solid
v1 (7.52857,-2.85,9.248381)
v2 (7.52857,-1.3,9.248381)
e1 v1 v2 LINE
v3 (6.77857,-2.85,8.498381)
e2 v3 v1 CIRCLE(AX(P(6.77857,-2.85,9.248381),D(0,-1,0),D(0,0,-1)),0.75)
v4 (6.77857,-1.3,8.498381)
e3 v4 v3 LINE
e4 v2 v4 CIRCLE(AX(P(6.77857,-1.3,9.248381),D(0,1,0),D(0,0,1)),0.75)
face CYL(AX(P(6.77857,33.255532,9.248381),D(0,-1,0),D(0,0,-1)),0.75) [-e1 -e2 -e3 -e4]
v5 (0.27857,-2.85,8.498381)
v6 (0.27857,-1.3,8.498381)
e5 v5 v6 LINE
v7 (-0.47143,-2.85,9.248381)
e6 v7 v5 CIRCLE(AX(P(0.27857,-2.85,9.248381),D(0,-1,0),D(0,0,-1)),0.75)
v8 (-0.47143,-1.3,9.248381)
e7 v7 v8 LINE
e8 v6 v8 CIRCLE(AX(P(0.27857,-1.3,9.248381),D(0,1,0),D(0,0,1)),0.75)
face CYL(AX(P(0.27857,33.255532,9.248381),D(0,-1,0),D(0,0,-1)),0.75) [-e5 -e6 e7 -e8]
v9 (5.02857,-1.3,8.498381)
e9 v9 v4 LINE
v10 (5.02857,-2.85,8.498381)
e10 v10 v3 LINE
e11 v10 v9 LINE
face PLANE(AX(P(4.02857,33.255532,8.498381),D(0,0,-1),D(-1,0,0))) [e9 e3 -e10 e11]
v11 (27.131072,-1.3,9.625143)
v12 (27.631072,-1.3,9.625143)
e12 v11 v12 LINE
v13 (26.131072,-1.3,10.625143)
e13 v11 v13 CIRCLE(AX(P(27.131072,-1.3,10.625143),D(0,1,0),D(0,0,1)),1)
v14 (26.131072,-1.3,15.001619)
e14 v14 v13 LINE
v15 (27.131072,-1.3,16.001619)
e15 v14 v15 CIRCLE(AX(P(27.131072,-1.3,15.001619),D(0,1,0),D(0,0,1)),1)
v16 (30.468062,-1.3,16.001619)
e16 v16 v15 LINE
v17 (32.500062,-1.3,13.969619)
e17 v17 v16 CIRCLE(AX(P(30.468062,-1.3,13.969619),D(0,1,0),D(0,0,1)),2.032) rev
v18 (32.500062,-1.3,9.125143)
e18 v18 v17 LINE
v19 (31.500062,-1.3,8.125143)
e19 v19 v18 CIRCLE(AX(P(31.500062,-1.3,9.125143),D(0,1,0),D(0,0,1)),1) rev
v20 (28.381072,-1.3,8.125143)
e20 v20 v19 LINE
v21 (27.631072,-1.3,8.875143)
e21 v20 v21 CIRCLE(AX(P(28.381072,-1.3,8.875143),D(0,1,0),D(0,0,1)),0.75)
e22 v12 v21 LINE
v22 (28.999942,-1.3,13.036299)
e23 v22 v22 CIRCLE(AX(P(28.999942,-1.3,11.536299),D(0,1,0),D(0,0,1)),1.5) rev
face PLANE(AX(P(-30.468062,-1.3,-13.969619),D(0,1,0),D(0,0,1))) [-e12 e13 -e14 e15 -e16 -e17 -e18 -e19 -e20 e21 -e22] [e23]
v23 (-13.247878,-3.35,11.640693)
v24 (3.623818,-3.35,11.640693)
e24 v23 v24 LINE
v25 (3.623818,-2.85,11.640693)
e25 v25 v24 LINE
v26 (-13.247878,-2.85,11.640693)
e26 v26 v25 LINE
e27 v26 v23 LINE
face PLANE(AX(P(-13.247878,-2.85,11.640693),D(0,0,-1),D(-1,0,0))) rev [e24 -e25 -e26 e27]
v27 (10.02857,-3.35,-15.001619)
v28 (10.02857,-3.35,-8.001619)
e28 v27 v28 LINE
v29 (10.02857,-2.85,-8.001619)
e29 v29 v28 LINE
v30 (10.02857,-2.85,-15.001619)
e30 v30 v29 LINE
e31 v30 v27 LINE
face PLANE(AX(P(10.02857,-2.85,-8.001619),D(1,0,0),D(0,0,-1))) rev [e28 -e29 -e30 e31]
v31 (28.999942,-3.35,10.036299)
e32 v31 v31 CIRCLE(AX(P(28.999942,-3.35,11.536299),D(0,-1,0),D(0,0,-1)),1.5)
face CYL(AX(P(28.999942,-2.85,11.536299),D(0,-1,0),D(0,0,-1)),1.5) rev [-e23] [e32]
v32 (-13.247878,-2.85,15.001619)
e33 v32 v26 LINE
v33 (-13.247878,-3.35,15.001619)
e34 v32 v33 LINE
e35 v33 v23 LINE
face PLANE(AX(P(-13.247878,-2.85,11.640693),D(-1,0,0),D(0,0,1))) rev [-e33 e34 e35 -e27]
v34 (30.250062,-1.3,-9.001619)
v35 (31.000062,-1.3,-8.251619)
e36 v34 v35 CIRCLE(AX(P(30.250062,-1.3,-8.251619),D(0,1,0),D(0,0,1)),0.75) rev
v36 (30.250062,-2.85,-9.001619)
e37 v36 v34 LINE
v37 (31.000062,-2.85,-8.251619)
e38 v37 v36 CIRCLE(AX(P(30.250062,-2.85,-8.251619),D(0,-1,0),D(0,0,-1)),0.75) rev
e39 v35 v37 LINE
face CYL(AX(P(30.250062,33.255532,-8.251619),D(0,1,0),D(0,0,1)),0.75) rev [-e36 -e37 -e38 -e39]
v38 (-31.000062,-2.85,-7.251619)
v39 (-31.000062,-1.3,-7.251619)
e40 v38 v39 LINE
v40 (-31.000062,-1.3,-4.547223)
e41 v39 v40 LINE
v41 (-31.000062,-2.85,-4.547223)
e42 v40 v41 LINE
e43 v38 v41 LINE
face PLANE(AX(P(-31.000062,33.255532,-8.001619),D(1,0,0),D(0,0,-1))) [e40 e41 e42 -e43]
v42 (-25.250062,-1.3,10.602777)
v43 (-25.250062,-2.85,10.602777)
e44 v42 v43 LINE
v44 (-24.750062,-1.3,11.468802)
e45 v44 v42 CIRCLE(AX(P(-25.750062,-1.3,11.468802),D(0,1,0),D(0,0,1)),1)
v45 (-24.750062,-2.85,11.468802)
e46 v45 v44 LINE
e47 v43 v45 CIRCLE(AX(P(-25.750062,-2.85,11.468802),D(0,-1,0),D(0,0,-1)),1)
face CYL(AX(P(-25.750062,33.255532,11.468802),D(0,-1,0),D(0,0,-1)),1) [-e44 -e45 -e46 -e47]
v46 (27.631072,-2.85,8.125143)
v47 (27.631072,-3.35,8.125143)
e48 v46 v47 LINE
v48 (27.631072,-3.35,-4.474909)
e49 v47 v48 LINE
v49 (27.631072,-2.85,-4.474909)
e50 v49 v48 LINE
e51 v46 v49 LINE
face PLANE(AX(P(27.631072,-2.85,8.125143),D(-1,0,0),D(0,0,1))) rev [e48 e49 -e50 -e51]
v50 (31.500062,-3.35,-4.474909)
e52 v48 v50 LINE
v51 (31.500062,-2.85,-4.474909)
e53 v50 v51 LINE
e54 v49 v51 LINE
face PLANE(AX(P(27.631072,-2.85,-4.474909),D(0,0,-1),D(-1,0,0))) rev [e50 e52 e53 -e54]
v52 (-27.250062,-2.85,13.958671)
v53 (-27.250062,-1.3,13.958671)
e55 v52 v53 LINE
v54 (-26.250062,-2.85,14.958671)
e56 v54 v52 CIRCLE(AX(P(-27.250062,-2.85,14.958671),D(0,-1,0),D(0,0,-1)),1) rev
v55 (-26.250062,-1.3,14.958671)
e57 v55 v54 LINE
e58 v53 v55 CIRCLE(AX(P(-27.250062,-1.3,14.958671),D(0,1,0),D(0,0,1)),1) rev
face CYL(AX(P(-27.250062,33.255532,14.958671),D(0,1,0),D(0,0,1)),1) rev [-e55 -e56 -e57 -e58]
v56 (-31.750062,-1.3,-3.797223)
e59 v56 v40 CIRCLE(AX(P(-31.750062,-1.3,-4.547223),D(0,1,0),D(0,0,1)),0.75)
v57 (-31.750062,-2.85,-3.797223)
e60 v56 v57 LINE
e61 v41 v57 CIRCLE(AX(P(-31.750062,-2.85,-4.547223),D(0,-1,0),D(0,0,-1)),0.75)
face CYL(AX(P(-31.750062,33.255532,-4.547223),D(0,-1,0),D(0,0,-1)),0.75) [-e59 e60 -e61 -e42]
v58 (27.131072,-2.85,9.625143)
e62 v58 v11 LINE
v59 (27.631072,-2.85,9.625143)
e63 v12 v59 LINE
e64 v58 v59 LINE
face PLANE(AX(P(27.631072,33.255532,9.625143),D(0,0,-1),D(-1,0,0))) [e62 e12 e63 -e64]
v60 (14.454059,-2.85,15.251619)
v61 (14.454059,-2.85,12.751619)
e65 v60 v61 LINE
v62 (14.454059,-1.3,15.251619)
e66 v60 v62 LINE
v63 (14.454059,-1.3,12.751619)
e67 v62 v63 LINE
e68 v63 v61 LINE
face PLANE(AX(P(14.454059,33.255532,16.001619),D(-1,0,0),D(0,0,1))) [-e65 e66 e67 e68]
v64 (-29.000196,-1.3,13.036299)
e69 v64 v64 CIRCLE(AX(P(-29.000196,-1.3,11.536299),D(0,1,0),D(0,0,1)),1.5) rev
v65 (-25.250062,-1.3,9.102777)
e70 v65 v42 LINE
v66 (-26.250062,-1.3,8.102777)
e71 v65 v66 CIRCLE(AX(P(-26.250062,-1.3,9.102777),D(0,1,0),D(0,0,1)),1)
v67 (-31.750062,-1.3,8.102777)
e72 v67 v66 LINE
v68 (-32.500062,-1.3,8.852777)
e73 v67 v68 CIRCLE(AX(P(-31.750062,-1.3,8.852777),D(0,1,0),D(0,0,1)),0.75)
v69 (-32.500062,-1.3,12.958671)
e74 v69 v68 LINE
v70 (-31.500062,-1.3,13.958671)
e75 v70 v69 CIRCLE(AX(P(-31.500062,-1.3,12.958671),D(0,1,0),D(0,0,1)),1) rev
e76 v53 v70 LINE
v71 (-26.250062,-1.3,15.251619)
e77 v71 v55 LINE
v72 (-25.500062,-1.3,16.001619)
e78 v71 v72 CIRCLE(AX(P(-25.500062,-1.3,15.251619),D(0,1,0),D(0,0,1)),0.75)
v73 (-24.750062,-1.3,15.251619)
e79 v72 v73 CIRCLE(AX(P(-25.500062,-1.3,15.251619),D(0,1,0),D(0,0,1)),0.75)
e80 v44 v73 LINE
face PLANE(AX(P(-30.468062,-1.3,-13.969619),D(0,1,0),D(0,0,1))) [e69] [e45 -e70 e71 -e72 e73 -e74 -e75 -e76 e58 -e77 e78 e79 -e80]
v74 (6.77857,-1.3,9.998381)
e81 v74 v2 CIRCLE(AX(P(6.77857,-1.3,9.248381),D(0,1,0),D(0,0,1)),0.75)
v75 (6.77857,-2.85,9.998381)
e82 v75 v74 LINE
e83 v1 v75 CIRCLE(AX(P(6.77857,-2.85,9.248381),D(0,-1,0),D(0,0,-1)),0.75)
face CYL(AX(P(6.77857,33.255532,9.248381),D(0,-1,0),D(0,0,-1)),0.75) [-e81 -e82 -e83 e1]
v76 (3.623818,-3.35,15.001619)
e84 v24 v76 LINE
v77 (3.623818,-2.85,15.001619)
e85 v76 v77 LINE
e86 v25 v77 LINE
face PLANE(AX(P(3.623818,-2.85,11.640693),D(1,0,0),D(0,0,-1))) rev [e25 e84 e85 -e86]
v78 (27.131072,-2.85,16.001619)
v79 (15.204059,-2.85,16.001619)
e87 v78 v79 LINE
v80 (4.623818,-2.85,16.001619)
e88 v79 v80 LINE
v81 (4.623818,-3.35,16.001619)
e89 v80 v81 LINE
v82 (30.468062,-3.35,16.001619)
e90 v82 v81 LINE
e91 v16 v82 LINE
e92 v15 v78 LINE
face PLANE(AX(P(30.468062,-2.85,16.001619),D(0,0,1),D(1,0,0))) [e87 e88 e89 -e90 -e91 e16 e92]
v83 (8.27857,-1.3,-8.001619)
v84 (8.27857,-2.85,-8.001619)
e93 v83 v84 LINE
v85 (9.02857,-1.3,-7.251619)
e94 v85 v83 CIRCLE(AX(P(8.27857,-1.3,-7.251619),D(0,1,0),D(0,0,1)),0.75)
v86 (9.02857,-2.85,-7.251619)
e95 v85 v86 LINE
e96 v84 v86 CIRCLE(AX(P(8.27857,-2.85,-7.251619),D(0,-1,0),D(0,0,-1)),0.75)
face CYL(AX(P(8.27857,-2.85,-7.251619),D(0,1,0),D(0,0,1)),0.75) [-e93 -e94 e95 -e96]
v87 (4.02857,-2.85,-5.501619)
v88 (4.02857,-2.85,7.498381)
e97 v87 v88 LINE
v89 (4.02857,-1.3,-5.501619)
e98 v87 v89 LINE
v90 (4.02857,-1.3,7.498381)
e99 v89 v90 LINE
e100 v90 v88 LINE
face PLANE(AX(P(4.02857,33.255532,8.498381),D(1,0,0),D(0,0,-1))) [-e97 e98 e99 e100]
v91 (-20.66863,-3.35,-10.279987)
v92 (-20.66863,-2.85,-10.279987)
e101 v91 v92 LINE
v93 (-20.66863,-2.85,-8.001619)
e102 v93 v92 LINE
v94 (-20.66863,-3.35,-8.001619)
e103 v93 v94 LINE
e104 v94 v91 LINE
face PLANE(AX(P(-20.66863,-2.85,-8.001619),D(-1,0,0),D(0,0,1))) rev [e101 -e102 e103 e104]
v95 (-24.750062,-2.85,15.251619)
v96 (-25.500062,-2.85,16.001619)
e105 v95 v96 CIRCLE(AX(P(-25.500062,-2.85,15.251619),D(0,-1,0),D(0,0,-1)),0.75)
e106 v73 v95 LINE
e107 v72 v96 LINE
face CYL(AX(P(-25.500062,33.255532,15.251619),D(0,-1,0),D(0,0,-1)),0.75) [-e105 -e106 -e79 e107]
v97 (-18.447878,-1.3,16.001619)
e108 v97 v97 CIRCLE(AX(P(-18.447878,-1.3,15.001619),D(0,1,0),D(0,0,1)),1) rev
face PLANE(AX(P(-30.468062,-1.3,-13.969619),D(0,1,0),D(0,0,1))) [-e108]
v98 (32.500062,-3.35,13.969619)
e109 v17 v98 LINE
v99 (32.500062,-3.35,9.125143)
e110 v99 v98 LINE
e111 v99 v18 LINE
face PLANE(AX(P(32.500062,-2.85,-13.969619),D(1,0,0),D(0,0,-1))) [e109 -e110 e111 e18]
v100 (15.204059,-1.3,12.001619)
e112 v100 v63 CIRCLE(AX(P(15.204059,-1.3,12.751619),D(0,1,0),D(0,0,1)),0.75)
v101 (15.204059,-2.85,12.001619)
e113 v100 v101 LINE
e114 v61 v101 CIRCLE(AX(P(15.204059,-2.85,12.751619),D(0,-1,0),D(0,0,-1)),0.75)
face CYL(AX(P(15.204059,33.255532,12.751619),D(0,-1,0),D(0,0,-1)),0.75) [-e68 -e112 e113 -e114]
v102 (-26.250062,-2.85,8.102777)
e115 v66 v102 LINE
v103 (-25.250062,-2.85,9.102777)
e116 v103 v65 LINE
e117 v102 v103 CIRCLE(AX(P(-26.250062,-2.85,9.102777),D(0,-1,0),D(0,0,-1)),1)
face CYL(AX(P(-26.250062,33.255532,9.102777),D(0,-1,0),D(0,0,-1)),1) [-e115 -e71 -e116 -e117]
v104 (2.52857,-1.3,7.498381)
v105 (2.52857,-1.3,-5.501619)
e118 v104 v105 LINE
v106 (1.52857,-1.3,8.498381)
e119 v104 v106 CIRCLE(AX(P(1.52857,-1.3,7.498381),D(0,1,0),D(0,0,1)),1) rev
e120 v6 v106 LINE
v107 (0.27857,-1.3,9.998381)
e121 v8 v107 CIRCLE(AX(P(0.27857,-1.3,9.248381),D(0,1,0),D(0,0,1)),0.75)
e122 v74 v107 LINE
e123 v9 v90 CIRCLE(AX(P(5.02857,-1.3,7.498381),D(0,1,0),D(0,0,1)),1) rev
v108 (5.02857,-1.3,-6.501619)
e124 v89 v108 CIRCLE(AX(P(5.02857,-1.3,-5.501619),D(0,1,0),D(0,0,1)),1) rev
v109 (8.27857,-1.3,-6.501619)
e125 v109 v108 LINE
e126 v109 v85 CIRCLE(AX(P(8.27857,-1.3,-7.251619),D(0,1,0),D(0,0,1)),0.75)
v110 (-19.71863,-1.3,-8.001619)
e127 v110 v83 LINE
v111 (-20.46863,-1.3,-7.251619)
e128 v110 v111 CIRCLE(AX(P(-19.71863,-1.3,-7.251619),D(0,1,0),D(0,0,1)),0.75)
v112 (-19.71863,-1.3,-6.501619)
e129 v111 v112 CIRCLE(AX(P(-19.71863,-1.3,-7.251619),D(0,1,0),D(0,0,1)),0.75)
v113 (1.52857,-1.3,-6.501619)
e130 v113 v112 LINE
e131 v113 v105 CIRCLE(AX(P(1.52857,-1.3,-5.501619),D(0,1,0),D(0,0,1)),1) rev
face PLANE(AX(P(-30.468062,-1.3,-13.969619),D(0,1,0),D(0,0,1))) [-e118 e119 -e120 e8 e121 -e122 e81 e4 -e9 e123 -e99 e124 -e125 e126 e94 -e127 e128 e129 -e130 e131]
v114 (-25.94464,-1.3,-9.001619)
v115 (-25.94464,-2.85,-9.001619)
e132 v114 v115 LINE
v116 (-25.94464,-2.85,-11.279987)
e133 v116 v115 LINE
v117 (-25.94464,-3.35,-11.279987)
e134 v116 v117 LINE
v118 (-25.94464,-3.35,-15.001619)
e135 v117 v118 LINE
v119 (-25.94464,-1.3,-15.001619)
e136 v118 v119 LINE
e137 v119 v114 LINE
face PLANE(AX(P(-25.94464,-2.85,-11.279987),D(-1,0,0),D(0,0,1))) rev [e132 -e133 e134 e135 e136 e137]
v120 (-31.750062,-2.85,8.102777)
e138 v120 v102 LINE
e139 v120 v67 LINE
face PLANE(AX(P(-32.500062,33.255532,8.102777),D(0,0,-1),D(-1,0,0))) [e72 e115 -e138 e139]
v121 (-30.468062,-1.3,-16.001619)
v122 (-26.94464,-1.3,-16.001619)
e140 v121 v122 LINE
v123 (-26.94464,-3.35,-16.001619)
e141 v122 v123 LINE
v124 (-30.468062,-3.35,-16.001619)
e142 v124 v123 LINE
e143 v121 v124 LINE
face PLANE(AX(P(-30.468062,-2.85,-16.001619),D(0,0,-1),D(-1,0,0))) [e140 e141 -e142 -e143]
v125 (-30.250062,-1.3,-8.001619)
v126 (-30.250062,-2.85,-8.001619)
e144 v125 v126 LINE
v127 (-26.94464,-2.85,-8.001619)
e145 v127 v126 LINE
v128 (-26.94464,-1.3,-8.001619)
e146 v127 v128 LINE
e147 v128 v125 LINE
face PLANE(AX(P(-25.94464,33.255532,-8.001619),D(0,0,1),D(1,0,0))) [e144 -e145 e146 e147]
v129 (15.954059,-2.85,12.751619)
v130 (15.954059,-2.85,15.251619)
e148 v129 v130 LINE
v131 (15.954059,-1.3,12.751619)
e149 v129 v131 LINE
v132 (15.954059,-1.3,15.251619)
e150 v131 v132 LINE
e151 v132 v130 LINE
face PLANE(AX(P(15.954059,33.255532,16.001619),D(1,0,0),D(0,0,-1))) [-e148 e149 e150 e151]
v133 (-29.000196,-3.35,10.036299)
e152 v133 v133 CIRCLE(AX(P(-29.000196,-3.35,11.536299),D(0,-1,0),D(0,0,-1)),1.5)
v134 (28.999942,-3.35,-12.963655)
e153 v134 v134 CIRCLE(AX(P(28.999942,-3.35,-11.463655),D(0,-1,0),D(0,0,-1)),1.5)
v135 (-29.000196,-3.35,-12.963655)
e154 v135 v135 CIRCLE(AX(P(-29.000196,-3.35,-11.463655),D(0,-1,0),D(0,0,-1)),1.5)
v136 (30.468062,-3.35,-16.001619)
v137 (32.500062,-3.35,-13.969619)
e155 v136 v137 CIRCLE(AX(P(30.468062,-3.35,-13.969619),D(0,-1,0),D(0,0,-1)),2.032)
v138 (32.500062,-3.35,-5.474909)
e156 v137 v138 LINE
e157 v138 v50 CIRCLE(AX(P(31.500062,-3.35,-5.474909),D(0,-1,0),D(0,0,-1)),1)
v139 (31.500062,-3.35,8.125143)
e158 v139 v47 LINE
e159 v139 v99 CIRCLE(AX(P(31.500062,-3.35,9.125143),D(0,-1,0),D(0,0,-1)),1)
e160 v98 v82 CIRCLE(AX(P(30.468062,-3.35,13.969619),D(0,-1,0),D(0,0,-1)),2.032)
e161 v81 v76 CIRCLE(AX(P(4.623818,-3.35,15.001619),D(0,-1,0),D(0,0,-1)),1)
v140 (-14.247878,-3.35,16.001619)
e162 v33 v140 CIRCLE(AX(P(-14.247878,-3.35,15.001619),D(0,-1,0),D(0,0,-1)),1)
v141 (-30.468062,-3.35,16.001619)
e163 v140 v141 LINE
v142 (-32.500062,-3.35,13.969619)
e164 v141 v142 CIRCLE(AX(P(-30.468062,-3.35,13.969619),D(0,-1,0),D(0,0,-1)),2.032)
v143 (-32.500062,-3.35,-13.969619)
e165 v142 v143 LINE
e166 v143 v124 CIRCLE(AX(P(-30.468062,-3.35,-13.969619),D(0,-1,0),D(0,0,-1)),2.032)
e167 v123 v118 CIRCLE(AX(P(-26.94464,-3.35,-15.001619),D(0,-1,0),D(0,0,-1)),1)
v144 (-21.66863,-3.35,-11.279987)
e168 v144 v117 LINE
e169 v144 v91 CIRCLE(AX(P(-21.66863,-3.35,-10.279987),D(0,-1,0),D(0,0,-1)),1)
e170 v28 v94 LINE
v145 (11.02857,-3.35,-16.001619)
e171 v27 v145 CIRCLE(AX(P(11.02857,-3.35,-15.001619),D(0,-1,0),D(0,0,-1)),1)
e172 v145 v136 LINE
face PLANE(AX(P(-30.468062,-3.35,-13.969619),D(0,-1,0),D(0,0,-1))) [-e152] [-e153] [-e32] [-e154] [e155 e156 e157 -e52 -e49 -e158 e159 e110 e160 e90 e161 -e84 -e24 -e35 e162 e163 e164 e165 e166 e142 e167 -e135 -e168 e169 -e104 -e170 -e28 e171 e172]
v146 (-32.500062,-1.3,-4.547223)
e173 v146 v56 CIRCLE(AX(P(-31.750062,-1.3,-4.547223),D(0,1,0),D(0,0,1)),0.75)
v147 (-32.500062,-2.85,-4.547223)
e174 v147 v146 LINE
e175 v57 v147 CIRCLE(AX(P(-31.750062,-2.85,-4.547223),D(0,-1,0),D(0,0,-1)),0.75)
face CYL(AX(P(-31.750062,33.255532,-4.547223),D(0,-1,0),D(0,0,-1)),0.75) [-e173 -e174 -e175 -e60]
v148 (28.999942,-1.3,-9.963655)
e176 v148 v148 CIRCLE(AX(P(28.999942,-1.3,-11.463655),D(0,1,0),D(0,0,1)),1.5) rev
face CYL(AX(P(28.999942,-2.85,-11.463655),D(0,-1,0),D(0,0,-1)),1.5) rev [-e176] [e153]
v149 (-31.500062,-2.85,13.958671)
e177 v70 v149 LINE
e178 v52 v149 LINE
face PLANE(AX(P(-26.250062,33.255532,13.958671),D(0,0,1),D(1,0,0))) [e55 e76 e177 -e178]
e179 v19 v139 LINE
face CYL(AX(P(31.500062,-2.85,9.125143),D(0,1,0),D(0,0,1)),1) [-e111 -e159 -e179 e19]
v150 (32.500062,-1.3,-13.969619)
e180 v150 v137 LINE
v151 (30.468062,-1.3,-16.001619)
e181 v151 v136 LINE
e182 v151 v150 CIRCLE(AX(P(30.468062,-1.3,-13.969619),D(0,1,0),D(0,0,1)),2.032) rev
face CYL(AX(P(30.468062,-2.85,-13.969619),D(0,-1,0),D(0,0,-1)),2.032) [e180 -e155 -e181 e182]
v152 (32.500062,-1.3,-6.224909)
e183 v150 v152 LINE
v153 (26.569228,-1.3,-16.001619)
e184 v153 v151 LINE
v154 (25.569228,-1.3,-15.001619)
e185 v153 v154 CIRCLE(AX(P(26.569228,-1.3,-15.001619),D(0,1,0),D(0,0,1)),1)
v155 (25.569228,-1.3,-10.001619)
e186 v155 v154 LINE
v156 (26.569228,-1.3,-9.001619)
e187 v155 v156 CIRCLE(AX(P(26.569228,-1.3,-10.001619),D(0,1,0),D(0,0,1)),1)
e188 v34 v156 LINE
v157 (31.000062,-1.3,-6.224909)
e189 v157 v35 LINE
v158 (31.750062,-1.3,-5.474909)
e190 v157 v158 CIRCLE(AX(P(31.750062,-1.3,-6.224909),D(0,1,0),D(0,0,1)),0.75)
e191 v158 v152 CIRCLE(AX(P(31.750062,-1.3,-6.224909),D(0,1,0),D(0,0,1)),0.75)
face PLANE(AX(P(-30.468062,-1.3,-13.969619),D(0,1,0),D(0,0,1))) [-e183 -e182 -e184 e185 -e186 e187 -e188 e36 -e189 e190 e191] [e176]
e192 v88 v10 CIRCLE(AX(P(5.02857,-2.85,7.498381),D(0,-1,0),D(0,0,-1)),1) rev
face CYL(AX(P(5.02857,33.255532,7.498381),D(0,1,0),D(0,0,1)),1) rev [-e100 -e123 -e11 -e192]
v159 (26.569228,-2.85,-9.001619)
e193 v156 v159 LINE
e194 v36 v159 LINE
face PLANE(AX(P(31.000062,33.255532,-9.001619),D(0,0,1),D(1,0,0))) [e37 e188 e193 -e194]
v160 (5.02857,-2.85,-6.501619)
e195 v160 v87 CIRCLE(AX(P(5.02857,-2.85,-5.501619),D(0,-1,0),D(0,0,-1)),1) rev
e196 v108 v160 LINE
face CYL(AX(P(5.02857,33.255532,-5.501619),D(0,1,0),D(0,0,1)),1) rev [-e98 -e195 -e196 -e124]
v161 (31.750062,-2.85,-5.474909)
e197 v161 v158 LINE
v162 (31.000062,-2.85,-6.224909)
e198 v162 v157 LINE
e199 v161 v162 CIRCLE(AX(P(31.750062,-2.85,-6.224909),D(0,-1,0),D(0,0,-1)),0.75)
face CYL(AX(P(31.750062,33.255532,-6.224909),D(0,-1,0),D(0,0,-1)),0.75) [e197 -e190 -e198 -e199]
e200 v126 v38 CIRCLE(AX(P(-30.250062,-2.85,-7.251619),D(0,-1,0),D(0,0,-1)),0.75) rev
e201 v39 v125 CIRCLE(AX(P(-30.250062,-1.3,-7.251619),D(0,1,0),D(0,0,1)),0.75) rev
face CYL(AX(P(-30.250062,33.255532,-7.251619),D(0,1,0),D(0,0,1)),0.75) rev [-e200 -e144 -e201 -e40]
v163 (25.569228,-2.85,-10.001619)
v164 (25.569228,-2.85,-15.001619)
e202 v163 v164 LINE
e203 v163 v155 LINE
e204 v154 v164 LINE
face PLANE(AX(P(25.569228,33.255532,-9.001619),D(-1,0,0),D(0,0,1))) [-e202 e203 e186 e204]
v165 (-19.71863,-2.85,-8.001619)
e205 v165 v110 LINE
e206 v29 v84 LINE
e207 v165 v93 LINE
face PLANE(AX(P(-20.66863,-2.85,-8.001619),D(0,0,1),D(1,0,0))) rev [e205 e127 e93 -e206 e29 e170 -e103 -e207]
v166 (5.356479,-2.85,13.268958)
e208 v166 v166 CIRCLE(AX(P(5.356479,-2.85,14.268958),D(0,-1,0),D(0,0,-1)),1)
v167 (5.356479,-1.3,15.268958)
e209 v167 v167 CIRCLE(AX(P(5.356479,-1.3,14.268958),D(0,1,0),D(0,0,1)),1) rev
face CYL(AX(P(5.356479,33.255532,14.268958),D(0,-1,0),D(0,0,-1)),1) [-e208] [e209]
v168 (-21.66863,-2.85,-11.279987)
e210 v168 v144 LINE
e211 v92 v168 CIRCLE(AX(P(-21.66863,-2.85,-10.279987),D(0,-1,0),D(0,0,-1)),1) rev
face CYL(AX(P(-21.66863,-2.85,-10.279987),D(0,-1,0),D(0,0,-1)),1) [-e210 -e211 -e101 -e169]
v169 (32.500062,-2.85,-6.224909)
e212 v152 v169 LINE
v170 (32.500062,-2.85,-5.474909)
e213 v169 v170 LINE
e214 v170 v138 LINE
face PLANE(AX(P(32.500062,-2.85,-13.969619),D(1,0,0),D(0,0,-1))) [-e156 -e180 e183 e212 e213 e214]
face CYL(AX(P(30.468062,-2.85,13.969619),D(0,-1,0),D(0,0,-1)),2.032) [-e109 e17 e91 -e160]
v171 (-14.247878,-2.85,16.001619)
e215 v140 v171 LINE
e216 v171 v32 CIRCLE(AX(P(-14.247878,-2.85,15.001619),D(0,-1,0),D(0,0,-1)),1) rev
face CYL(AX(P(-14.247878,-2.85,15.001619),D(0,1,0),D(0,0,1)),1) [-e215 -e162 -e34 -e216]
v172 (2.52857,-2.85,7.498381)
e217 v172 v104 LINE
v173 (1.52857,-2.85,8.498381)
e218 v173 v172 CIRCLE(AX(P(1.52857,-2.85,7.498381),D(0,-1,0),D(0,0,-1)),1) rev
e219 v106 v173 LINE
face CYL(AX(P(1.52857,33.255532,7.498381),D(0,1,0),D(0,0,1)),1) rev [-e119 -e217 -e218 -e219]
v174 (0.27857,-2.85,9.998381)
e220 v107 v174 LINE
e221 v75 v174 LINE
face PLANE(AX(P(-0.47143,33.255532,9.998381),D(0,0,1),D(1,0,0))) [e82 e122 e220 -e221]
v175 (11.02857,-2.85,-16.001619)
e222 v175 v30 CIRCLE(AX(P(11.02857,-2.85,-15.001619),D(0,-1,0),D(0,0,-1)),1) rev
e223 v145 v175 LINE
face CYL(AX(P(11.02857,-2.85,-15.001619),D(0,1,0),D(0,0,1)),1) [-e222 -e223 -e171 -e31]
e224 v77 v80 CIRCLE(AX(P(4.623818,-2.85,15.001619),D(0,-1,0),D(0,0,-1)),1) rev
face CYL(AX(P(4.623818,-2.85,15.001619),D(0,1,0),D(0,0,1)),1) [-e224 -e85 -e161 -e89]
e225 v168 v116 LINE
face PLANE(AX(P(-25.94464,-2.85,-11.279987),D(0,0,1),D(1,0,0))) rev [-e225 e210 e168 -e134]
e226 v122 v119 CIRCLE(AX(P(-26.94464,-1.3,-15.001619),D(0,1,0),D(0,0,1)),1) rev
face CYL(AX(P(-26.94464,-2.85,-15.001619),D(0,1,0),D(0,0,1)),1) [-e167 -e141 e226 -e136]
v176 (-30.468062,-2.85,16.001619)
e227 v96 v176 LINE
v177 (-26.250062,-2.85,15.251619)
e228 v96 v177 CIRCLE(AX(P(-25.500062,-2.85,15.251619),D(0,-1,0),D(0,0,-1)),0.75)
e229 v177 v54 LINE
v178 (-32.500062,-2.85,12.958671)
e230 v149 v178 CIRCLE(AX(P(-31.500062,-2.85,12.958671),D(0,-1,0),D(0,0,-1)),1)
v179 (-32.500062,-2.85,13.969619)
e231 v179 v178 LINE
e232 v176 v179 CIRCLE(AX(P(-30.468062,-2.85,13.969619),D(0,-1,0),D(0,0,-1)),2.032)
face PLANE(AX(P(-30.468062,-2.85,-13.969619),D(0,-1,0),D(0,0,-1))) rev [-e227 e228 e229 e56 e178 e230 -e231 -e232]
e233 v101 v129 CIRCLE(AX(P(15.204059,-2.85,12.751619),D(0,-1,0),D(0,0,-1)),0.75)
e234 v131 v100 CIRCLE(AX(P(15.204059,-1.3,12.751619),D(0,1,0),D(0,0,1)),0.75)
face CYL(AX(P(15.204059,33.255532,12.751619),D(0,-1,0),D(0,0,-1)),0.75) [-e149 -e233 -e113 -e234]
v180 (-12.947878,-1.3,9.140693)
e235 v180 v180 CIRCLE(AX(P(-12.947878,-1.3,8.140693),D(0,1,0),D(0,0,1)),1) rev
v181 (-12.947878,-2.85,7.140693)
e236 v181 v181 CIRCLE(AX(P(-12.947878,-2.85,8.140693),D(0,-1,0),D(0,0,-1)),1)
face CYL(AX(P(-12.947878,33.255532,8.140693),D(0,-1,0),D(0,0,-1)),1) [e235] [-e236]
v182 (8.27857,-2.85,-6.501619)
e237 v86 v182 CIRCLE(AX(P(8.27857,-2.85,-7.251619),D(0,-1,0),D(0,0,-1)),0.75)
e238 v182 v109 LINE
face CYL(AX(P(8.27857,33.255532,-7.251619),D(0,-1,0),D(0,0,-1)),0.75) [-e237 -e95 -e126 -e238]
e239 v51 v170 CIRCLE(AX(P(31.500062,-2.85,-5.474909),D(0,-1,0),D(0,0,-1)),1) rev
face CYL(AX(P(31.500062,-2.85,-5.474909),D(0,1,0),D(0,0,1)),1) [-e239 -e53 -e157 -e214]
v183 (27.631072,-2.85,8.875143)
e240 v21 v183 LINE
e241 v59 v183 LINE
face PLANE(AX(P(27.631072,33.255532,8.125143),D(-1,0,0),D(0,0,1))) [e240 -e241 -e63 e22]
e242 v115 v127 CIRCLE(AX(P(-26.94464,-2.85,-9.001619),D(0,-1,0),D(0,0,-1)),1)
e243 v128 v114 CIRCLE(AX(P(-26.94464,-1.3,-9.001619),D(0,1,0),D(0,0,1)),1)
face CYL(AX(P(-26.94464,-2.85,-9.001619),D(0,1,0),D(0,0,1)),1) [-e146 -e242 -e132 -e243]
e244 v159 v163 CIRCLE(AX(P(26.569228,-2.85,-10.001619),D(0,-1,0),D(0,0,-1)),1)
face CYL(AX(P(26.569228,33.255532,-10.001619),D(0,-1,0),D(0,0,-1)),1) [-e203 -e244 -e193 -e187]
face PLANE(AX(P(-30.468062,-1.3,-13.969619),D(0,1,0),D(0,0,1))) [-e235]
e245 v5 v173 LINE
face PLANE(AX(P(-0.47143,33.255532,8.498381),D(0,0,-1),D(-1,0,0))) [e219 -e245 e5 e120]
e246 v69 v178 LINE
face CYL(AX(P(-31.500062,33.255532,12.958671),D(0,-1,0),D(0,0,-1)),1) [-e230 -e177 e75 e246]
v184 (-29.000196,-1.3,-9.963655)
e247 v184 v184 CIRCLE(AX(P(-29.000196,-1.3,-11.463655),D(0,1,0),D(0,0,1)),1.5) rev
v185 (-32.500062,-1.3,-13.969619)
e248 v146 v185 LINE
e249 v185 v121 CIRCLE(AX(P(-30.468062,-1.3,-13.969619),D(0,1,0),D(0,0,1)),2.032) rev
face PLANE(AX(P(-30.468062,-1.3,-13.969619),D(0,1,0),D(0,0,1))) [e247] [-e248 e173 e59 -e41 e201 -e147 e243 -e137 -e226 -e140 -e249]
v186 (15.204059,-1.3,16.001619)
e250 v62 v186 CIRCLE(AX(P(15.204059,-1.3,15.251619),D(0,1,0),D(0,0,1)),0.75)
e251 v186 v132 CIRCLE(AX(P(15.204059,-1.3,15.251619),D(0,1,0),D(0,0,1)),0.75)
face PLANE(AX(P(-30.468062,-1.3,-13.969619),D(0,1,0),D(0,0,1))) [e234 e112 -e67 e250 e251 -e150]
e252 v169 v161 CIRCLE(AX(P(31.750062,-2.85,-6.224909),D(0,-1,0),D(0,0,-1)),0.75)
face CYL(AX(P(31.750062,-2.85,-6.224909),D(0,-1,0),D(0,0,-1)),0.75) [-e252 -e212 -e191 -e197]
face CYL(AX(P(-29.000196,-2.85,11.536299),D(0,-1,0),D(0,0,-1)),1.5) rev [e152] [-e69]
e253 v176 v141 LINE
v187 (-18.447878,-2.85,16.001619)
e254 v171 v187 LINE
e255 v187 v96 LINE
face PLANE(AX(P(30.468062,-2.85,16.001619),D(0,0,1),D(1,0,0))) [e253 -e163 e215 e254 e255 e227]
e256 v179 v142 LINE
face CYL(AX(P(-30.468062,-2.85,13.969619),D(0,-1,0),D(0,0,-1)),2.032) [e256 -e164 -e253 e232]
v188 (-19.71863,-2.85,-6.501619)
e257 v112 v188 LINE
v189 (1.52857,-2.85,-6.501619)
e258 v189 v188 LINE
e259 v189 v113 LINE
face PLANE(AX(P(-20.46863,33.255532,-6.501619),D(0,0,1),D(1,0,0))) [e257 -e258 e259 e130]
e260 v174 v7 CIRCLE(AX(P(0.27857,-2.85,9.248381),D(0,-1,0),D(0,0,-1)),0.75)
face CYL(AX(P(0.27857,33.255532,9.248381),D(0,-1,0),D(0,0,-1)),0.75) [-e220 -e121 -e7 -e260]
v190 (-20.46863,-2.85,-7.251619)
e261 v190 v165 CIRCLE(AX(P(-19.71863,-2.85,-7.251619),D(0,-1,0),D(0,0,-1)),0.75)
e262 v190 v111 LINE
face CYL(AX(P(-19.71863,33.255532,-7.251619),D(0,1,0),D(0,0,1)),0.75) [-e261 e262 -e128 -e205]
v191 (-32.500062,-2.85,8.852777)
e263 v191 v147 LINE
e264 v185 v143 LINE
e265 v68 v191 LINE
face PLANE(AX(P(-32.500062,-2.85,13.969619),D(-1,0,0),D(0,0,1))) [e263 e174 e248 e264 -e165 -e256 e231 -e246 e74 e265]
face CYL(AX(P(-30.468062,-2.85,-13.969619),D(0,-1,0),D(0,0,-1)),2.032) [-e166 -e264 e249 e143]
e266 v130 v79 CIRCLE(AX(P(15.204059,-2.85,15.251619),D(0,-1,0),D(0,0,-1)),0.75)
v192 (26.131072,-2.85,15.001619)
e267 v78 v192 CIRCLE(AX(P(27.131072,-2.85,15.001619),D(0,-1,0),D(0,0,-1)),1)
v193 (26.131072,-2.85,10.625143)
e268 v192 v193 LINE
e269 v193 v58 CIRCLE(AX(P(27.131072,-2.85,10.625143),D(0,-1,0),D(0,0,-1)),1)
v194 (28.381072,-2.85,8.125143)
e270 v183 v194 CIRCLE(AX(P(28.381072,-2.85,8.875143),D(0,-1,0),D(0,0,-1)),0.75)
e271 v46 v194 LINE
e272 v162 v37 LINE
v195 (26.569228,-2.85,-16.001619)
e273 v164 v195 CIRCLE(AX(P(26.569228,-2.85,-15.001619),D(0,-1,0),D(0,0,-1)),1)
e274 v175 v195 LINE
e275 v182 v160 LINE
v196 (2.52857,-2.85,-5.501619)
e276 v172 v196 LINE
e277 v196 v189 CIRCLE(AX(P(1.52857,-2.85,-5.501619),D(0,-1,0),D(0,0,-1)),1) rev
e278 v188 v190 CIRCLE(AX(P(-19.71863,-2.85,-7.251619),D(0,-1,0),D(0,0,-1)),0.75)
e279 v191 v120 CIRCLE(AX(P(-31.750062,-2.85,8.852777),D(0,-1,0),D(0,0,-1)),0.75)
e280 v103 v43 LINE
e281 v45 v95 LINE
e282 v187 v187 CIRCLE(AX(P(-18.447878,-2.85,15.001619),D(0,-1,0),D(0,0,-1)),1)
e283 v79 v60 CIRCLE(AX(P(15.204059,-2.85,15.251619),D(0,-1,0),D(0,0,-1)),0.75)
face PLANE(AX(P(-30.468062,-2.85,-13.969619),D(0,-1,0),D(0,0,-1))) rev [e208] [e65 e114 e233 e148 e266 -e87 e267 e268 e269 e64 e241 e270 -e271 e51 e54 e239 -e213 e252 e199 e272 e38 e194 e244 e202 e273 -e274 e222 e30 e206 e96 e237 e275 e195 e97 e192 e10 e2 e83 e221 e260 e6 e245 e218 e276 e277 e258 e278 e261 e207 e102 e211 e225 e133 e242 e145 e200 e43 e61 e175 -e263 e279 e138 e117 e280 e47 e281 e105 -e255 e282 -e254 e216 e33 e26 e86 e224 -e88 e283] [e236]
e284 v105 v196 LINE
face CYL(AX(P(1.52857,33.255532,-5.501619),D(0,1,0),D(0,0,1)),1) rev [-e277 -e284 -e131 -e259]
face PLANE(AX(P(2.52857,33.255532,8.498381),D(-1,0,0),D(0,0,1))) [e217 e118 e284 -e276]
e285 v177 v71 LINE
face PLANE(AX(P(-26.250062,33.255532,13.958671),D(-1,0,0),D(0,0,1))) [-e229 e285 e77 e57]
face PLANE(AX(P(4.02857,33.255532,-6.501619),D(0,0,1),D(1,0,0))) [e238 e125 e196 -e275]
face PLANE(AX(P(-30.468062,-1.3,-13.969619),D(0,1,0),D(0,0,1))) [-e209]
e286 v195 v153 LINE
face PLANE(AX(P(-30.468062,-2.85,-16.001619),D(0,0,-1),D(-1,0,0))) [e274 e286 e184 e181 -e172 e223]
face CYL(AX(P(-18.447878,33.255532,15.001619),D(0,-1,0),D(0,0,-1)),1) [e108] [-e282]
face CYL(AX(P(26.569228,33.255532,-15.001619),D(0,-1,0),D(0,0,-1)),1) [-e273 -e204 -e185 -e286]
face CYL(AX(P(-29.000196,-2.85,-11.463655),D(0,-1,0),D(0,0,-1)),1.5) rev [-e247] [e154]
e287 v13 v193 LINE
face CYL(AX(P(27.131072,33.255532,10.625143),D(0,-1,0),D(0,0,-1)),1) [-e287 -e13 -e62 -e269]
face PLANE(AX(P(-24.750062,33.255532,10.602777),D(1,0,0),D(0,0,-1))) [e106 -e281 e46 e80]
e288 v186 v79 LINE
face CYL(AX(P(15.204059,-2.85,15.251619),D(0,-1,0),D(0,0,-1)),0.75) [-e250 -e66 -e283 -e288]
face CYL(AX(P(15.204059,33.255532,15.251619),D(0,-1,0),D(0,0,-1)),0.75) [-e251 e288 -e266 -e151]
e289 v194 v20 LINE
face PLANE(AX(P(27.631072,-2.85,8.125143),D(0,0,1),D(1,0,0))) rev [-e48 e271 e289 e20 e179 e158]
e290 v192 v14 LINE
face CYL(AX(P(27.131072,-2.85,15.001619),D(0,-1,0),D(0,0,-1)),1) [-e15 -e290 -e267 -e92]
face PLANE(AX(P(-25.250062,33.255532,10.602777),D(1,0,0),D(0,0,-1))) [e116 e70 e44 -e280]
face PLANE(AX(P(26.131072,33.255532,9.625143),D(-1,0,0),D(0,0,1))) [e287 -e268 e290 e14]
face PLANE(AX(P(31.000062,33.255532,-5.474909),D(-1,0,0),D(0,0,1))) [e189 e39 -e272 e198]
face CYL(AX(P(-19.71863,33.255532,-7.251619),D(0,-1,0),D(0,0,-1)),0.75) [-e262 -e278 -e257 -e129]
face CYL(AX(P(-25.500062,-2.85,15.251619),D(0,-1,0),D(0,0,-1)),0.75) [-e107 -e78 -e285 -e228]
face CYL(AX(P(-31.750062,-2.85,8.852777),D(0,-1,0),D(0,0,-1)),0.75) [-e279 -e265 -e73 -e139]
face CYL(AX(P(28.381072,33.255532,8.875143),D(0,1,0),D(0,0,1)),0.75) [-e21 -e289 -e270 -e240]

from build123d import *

# Parameters (mm, degrees)
SKETCH1_R           = 1.5
BOSS_EXTRUDE1_DEPTH = 0.5
SKETCH2_W           = 16.871696
SKETCH2_H           = 4.360926
SKETCH2_W_2         = 4.86899
SKETCH2_H_2         = 12.600052
CUT_EXTRUDE2_DEPTH  = 37.229212531
FILLET1_R           = 1
SKETCH3_R           = 1
SKETCH3_W           = 1.5
SKETCH3_H           = 4
SKETCH3_R_2         = 1.5
BOSS_EXTRUDE2_DEPTH = 2.05
FILLET2_R           = 1
FILLET4_R           = 0.75


# Some blends are built 0.0001 mm under size
with BuildPart() as part:
    # Sketch1 → Boss-Extrude1 (new body)
    with BuildSketch(Plane.XZ.offset(3.35)):
        with BuildLine():
            Line((-30.468062, -16.001619), (30.468062, -16.001619))
            ThreePointArc((30.468062, -16.001619), (31.904902979, -15.406459979), (32.500062, -13.969619))
            Line((32.500062, -13.969619), (32.500062, 13.969619))
            ThreePointArc((32.500062, 13.969619), (31.904902979, 15.406459979), (30.468062, 16.001619))
            Line((30.468062, 16.001619), (-30.468062, 16.001619))
            ThreePointArc((-30.468062, 16.001619), (-31.904902979, 15.406459979), (-32.500062, 13.969619))
            Line((-32.500062, 13.969619), (-32.500062, -13.969619))
            ThreePointArc((-32.500062, -13.969619), (-31.904902979, -15.406459979), (-30.468062, -16.001619))
        make_face()
        with Locations(Location((28.999942, -11.463655, 0), (0, 0, 270))):
            Circle(SKETCH1_R, mode=Mode.SUBTRACT)
        with Locations(Location((28.999942, 11.536299, 0), (0, 0, 270))):
            Circle(SKETCH1_R, mode=Mode.SUBTRACT)
        with Locations(Location((-29.000196, -11.463655, 0), (0, 0, 270))):
            Circle(SKETCH1_R, mode=Mode.SUBTRACT)
        with Locations(Location((-29.000196, 11.536299, 0), (0, 0, 270))):
            Circle(SKETCH1_R, mode=Mode.SUBTRACT)
    extrude(amount=-BOSS_EXTRUDE1_DEPTH)

    # Sketch2 → Cut-Extrude2 (cut, through all)
    with BuildSketch(Plane.XZ.offset(3.35)):
        with Locations((-4.81203, 13.821156)):
            Rectangle(SKETCH2_W, SKETCH2_H)
        Polygon((-20.66863, -8.001619), (10.02857, -8.001619), (10.02857, -16.001619), (-25.94464, -16.001619), (-25.94464, -11.279987), (-20.66863, -11.279987), align=None)
        with Locations((30.065567, 1.825117)):
            Rectangle(SKETCH2_W_2, SKETCH2_H_2)
    extrude(amount=-CUT_EXTRUDE2_DEPTH, mode=Mode.SUBTRACT)

    # Fillet1
    fillet1_edges = [part.edges().sort_by_distance(p)[0] for p in [
        (-13.247878, -3.1, 16.001619),
        (3.623818, -3.1, 16.001619),
        (-20.66863, -3.1, -11.279987),
        (10.02857, -3.1, -16.001619),
        (-25.94464, -3.1, -16.001619),
        (32.500062, -3.1, 8.125143),
        (32.500062, -3.1, -4.474909),
    ]]
    fillet(fillet1_edges, radius=FILLET1_R)

    # Sketch3 → Boss-Extrude2 (add)
    # profile 1 of 9: a face of its own
    with BuildSketch(Plane.XZ.offset(3.35)):
        with Locations(Location((-12.947878, 8.140693, 0), (0, 0, 270))):
            Circle(SKETCH3_R)
    # profile 2 of 9: a face of its own
    with BuildSketch(Plane.XZ.offset(3.35)):
        with Locations(Location((-18.447878, 15.001619, 0), (0, 0, 90))):
            Circle(SKETCH3_R)
    # profile 3 of 9: a face of its own
    with BuildSketch(Plane.XZ.offset(3.35)):
        with Locations(Location((5.356479, 14.268958, 0), (0, 0, 270))):
            Circle(SKETCH3_R)
    # profile 4 of 9: a face of its own
    with BuildSketch(Plane.XZ.offset(3.35)):
        Polygon((-20.46863, -8.001619), (9.02857, -8.001619), (9.02857, -6.501619), (4.02857, -6.501619), (4.02857, 8.498381), (7.52857, 8.498381), (7.52857, 9.998381), (-0.47143, 9.998381), (-0.47143, 8.498381), (2.52857, 8.498381), (2.52857, -6.501619), (-20.46863, -6.501619), align=None)
    # profile 5 of 9: a face of its own
    with BuildSketch(Plane.XZ.offset(3.35)):
        with Locations((15.204059, 14.001619)):
            Rectangle(SKETCH3_W, SKETCH3_H)
    # profile 6 of 9: a face of its own
    with BuildSketch(Plane.XZ.offset(3.35)):
        with BuildLine():
            Line((-32.500062, -3.797223), (-32.500062, -13.969619))
            ThreePointArc((-32.500062, -13.969619), (-31.904902979, -15.406459979), (-30.468062, -16.001619))
            Line((-30.468062, -16.001619), (-26.94464, -16.001619))
            ThreePointArc((-26.94464, -16.001619), (-26.237533219, -15.708725781), (-25.94464, -15.001619))
            Line((-25.94464, -15.001619), (-25.94464, -8.001619))
            Line((-25.94464, -8.001619), (-31.000062, -8.001619))
            Line((-31.000062, -8.001619), (-31.000062, -3.797223))
            Line((-31.000062, -3.797223), (-32.500062, -3.797223))
        make_face()
        with Locations(Location((-29.000196, -11.463655, 0), (0, 0, 270))):
            Circle(SKETCH3_R_2, mode=Mode.SUBTRACT)
    # profile 7 of 9: a face of its own
    with BuildSketch(Plane.XZ.offset(3.35)):
        with BuildLine():
            Line((32.500062, -5.474909), (31.000062, -5.474909))
            Line((31.000062, -5.474909), (31.000062, -9.001619))
            Line((31.000062, -9.001619), (25.569228, -9.001619))
            Line((25.569228, -9.001619), (25.569228, -16.001619))
            Line((25.569228, -16.001619), (30.468062, -16.001619))
            ThreePointArc((30.468062, -16.001619), (31.904902979, -15.406459979), (32.500062, -13.969619))
            Line((32.500062, -13.969619), (32.500062, -5.474909))
        make_face()
        with Locations(Location((28.999942, -11.463655, 0), (0, 0, 270))):
            Circle(SKETCH3_R_2, mode=Mode.SUBTRACT)
    # profile 8 of 9: a face of its own
    with BuildSketch(Plane.XZ.offset(3.35)):
        with BuildLine():
            Line((27.631072, 8.125143), (27.631072, 9.625143))
            Line((27.631072, 9.625143), (26.131072, 9.625143))
            Line((26.131072, 9.625143), (26.131072, 16.001619))
            Line((26.131072, 16.001619), (30.468062, 16.001619))
            ThreePointArc((30.468062, 16.001619), (31.904902979, 15.406459979), (32.500062, 13.969619))
            Line((32.500062, 13.969619), (32.500062, 9.125143))
            ThreePointArc((32.500062, 9.125143), (32.207168781, 8.418036219), (31.500062, 8.125143))
            Line((31.500062, 8.125143), (27.631072, 8.125143))
        make_face()
        with Locations(Location((28.999942, 11.536299, 0), (0, 0, 270))):
            Circle(SKETCH3_R_2, mode=Mode.SUBTRACT)
    # profile 9 of 9: a face of its own
    with BuildSketch(Plane.XZ.offset(3.35)):
        with BuildLine():
            Line((-32.500062, 8.102777), (-25.250062, 8.102777))
            Line((-25.250062, 8.102777), (-25.250062, 10.602777))
            Line((-25.250062, 10.602777), (-24.750062, 10.602777))
            Line((-24.750062, 10.602777), (-24.750062, 16.001619))
            Line((-24.750062, 16.001619), (-26.250062, 16.001619))
            Line((-26.250062, 16.001619), (-26.250062, 13.958671))
            Line((-26.250062, 13.958671), (-31.500062, 13.958671))
            ThreePointArc((-31.500062, 13.958671), (-32.207168781, 13.665777781), (-32.500062, 12.958671))
            Line((-32.500062, 12.958671), (-32.500062, 8.102777))
        make_face()
        with Locations(Location((-29.000196, 11.536299, 0), (0, 0, 270))):
            Circle(SKETCH3_R_2, mode=Mode.SUBTRACT)
    extrude(amount=-BOSS_EXTRUDE2_DEPTH)

    # Fillet2
    # the kernel refuses this fillet: 1 mm, written as the material it adds along each edge
    with BuildSketch(Plane(origin=(4.02857, -5.35, -6.501619), x_dir=(1, 0, 0), z_dir=(0, 1, 0))) as fillet2_piece_1_section:
        with BuildLine():
            CenterArc((FILLET2_R, -FILLET2_R), FILLET2_R, 90, 90)
            Line((0, -FILLET2_R), (0, 0))
            Line((0, 0), (FILLET2_R, 0))
        make_face()
    fillet2_piece_1 = extrude(amount=4.05, mode=Mode.PRIVATE)
    fillet2_piece_1 = split(fillet2_piece_1, bisect_by=Plane(origin=(4.02857, -3.35, -6.501619), z_dir=(0, 1, 0)), keep=Keep.TOP, mode=Mode.PRIVATE)
    add(fillet2_piece_1)
    with BuildSketch(Plane(origin=(2.52857, -5.35, -6.501619), x_dir=(0, 0, 1), z_dir=(0, 1, 0))) as fillet2_piece_2_section:
        with BuildLine():
            CenterArc((FILLET2_R, -FILLET2_R), FILLET2_R, 90, 90)
            Line((0, -FILLET2_R), (0, 0))
            Line((0, 0), (FILLET2_R, 0))
        make_face()
    fillet2_piece_2 = extrude(amount=4.05, mode=Mode.PRIVATE)
    fillet2_piece_2 = split(fillet2_piece_2, bisect_by=Plane(origin=(2.52857, -3.35, -6.501619), z_dir=(0, 1, 0)), keep=Keep.TOP, mode=Mode.PRIVATE)
    add(fillet2_piece_2)
    with BuildSketch(Plane(origin=(2.52857, -5.35, 8.498381), x_dir=(-1, 0, 0), z_dir=(0, 1, 0))) as fillet2_piece_3_section:
        with BuildLine():
            CenterArc((FILLET2_R, -FILLET2_R), FILLET2_R, 90, 90)
            Line((0, -FILLET2_R), (0, 0))
            Line((0, 0), (FILLET2_R, 0))
        make_face()
    fillet2_piece_3 = extrude(amount=4.05, mode=Mode.PRIVATE)
    fillet2_piece_3 = split(fillet2_piece_3, bisect_by=Plane(origin=(2.52857, -3.35, 8.498381), z_dir=(0, 1, 0)), keep=Keep.TOP, mode=Mode.PRIVATE)
    add(fillet2_piece_3)
    with BuildSketch(Plane(origin=(4.02857, -5.35, 8.498381), x_dir=(0, 0, -1), z_dir=(0, 1, 0))) as fillet2_piece_4_section:
        with BuildLine():
            CenterArc((FILLET2_R, -FILLET2_R), FILLET2_R, 90, 90)
            Line((0, -FILLET2_R), (0, 0))
            Line((0, 0), (FILLET2_R, 0))
        make_face()
    fillet2_piece_4 = extrude(amount=4.05, mode=Mode.PRIVATE)
    fillet2_piece_4 = split(fillet2_piece_4, bisect_by=Plane(origin=(4.02857, -3.35, 8.498381), z_dir=(0, 1, 0)), keep=Keep.TOP, mode=Mode.PRIVATE)
    add(fillet2_piece_4)
    with BuildSketch(Plane(origin=(-26.250062, -5.35, 13.958671), x_dir=(-1, 0, 0), z_dir=(0, 1, 0))) as fillet2_piece_5_section:
        with BuildLine():
            CenterArc((FILLET2_R, FILLET2_R), FILLET2_R, 180, 90)
            Line((0, FILLET2_R), (0, 0))
            Line((0, 0), (FILLET2_R, 0))
        make_face()
    fillet2_piece_5 = extrude(amount=4.05, mode=Mode.PRIVATE)
    fillet2_piece_5 = split(fillet2_piece_5, bisect_by=Plane(origin=(-26.250062, -3.35, 13.958671), z_dir=(0, 1, 0)), keep=Keep.TOP, mode=Mode.PRIVATE)
    add(fillet2_piece_5)
    # the kernel refuses this fillet: 1 mm, written as the material it takes off along each edge
    with BuildSketch(Plane(origin=(-25.94464, -2.85, -8.001619), x_dir=(0, 0, -1), z_dir=(0, 1, 0)), Plane(origin=(26.131072, -2.85, 16.001619), x_dir=(1, 0, 0), z_dir=(0, 1, 0)), Plane(origin=(26.131072, -2.85, 9.625143), x_dir=(0, 0, 1), z_dir=(0, 1, 0)), Plane(origin=(-25.250062, -2.85, 8.102777), x_dir=(-1, 0, 0), z_dir=(0, 1, 0))) as fillet2_2_piece_1:
        with BuildLine():
            CenterArc((FILLET2_R, FILLET2_R), FILLET2_R, 180, 90)
            Line((0, FILLET2_R), (0, 0))
            Line((0, 0), (FILLET2_R, 0))
        make_face()
    extrude(amount=4.05, mode=Mode.SUBTRACT)
    with BuildSketch(Plane(origin=(25.569228, -2.85, -16.001619), x_dir=(1, 0, 0), z_dir=(0, 1, 0)), Plane(origin=(25.569228, -2.85, -9.001619), x_dir=(0, 0, -1), z_dir=(0, 1, 0))) as fillet2_2_piece_2:
        with BuildLine():
            CenterArc((FILLET2_R, -FILLET2_R), FILLET2_R, 90, 90)
            Line((0, -FILLET2_R), (0, 0))
            Line((0, 0), (FILLET2_R, 0))
        make_face()
    extrude(amount=4.05, mode=Mode.SUBTRACT)
    with BuildSketch(Plane(origin=(-24.750062, -2.85, 10.602777), x_dir=(0, 0, 1), z_dir=(0, 1, 0))) as fillet2_2_piece_3:
        with BuildLine():
            CenterArc((0.866025404, -1), FILLET2_R, 90, 60)
            Line((0, -0.5), (0, 0))
            Line((0, 0), (0.866025404, 0))
        make_face()
    extrude(amount=3.715063509, mode=Mode.SUBTRACT)

    # Fillet4
    fillet4_edges = [part.edges().sort_by_distance(p)[0] for p in [
        (-31.000062, -2.075, -8.001619),
        (-20.46863, -2.075, -8.001619),
        (-20.46863, -2.075, -6.501619),
        (-0.47143, -2.075, 8.498381),
        (-0.47143, -2.075, 9.998381),
        (7.52857, -2.075, 9.998381),
        (7.52857, -2.075, 8.498381),
        (9.02857, -2.075, -8.001619),
        (9.02857, -2.075, -6.501619),
        (31.000062, -2.075, -9.001619),
        (31.000062, -2.075, -5.474909),
        (32.500062, -2.075, -5.474909),
        (27.631072, -2.075, 8.125143),
        (14.454059, -2.075, 12.001619),
        (15.954059, -2.075, 12.001619),
        (15.954059, -2.075, 16.001619),
        (14.454059, -2.075, 16.001619),
        (-32.500062, -2.075, 8.102777),
        (-24.750062, -2.075, 16.001619),
        (-26.250062, -2.075, 16.001619),
        (-31.000062, -2.075, -3.797223),
        (-32.500062, -2.075, -3.797223),
    ]]
    fillet(fillet4_edges, radius=FILLET4_R - 0.0001)  # a hair under: the kernel refuses the full size


solid = part.part
